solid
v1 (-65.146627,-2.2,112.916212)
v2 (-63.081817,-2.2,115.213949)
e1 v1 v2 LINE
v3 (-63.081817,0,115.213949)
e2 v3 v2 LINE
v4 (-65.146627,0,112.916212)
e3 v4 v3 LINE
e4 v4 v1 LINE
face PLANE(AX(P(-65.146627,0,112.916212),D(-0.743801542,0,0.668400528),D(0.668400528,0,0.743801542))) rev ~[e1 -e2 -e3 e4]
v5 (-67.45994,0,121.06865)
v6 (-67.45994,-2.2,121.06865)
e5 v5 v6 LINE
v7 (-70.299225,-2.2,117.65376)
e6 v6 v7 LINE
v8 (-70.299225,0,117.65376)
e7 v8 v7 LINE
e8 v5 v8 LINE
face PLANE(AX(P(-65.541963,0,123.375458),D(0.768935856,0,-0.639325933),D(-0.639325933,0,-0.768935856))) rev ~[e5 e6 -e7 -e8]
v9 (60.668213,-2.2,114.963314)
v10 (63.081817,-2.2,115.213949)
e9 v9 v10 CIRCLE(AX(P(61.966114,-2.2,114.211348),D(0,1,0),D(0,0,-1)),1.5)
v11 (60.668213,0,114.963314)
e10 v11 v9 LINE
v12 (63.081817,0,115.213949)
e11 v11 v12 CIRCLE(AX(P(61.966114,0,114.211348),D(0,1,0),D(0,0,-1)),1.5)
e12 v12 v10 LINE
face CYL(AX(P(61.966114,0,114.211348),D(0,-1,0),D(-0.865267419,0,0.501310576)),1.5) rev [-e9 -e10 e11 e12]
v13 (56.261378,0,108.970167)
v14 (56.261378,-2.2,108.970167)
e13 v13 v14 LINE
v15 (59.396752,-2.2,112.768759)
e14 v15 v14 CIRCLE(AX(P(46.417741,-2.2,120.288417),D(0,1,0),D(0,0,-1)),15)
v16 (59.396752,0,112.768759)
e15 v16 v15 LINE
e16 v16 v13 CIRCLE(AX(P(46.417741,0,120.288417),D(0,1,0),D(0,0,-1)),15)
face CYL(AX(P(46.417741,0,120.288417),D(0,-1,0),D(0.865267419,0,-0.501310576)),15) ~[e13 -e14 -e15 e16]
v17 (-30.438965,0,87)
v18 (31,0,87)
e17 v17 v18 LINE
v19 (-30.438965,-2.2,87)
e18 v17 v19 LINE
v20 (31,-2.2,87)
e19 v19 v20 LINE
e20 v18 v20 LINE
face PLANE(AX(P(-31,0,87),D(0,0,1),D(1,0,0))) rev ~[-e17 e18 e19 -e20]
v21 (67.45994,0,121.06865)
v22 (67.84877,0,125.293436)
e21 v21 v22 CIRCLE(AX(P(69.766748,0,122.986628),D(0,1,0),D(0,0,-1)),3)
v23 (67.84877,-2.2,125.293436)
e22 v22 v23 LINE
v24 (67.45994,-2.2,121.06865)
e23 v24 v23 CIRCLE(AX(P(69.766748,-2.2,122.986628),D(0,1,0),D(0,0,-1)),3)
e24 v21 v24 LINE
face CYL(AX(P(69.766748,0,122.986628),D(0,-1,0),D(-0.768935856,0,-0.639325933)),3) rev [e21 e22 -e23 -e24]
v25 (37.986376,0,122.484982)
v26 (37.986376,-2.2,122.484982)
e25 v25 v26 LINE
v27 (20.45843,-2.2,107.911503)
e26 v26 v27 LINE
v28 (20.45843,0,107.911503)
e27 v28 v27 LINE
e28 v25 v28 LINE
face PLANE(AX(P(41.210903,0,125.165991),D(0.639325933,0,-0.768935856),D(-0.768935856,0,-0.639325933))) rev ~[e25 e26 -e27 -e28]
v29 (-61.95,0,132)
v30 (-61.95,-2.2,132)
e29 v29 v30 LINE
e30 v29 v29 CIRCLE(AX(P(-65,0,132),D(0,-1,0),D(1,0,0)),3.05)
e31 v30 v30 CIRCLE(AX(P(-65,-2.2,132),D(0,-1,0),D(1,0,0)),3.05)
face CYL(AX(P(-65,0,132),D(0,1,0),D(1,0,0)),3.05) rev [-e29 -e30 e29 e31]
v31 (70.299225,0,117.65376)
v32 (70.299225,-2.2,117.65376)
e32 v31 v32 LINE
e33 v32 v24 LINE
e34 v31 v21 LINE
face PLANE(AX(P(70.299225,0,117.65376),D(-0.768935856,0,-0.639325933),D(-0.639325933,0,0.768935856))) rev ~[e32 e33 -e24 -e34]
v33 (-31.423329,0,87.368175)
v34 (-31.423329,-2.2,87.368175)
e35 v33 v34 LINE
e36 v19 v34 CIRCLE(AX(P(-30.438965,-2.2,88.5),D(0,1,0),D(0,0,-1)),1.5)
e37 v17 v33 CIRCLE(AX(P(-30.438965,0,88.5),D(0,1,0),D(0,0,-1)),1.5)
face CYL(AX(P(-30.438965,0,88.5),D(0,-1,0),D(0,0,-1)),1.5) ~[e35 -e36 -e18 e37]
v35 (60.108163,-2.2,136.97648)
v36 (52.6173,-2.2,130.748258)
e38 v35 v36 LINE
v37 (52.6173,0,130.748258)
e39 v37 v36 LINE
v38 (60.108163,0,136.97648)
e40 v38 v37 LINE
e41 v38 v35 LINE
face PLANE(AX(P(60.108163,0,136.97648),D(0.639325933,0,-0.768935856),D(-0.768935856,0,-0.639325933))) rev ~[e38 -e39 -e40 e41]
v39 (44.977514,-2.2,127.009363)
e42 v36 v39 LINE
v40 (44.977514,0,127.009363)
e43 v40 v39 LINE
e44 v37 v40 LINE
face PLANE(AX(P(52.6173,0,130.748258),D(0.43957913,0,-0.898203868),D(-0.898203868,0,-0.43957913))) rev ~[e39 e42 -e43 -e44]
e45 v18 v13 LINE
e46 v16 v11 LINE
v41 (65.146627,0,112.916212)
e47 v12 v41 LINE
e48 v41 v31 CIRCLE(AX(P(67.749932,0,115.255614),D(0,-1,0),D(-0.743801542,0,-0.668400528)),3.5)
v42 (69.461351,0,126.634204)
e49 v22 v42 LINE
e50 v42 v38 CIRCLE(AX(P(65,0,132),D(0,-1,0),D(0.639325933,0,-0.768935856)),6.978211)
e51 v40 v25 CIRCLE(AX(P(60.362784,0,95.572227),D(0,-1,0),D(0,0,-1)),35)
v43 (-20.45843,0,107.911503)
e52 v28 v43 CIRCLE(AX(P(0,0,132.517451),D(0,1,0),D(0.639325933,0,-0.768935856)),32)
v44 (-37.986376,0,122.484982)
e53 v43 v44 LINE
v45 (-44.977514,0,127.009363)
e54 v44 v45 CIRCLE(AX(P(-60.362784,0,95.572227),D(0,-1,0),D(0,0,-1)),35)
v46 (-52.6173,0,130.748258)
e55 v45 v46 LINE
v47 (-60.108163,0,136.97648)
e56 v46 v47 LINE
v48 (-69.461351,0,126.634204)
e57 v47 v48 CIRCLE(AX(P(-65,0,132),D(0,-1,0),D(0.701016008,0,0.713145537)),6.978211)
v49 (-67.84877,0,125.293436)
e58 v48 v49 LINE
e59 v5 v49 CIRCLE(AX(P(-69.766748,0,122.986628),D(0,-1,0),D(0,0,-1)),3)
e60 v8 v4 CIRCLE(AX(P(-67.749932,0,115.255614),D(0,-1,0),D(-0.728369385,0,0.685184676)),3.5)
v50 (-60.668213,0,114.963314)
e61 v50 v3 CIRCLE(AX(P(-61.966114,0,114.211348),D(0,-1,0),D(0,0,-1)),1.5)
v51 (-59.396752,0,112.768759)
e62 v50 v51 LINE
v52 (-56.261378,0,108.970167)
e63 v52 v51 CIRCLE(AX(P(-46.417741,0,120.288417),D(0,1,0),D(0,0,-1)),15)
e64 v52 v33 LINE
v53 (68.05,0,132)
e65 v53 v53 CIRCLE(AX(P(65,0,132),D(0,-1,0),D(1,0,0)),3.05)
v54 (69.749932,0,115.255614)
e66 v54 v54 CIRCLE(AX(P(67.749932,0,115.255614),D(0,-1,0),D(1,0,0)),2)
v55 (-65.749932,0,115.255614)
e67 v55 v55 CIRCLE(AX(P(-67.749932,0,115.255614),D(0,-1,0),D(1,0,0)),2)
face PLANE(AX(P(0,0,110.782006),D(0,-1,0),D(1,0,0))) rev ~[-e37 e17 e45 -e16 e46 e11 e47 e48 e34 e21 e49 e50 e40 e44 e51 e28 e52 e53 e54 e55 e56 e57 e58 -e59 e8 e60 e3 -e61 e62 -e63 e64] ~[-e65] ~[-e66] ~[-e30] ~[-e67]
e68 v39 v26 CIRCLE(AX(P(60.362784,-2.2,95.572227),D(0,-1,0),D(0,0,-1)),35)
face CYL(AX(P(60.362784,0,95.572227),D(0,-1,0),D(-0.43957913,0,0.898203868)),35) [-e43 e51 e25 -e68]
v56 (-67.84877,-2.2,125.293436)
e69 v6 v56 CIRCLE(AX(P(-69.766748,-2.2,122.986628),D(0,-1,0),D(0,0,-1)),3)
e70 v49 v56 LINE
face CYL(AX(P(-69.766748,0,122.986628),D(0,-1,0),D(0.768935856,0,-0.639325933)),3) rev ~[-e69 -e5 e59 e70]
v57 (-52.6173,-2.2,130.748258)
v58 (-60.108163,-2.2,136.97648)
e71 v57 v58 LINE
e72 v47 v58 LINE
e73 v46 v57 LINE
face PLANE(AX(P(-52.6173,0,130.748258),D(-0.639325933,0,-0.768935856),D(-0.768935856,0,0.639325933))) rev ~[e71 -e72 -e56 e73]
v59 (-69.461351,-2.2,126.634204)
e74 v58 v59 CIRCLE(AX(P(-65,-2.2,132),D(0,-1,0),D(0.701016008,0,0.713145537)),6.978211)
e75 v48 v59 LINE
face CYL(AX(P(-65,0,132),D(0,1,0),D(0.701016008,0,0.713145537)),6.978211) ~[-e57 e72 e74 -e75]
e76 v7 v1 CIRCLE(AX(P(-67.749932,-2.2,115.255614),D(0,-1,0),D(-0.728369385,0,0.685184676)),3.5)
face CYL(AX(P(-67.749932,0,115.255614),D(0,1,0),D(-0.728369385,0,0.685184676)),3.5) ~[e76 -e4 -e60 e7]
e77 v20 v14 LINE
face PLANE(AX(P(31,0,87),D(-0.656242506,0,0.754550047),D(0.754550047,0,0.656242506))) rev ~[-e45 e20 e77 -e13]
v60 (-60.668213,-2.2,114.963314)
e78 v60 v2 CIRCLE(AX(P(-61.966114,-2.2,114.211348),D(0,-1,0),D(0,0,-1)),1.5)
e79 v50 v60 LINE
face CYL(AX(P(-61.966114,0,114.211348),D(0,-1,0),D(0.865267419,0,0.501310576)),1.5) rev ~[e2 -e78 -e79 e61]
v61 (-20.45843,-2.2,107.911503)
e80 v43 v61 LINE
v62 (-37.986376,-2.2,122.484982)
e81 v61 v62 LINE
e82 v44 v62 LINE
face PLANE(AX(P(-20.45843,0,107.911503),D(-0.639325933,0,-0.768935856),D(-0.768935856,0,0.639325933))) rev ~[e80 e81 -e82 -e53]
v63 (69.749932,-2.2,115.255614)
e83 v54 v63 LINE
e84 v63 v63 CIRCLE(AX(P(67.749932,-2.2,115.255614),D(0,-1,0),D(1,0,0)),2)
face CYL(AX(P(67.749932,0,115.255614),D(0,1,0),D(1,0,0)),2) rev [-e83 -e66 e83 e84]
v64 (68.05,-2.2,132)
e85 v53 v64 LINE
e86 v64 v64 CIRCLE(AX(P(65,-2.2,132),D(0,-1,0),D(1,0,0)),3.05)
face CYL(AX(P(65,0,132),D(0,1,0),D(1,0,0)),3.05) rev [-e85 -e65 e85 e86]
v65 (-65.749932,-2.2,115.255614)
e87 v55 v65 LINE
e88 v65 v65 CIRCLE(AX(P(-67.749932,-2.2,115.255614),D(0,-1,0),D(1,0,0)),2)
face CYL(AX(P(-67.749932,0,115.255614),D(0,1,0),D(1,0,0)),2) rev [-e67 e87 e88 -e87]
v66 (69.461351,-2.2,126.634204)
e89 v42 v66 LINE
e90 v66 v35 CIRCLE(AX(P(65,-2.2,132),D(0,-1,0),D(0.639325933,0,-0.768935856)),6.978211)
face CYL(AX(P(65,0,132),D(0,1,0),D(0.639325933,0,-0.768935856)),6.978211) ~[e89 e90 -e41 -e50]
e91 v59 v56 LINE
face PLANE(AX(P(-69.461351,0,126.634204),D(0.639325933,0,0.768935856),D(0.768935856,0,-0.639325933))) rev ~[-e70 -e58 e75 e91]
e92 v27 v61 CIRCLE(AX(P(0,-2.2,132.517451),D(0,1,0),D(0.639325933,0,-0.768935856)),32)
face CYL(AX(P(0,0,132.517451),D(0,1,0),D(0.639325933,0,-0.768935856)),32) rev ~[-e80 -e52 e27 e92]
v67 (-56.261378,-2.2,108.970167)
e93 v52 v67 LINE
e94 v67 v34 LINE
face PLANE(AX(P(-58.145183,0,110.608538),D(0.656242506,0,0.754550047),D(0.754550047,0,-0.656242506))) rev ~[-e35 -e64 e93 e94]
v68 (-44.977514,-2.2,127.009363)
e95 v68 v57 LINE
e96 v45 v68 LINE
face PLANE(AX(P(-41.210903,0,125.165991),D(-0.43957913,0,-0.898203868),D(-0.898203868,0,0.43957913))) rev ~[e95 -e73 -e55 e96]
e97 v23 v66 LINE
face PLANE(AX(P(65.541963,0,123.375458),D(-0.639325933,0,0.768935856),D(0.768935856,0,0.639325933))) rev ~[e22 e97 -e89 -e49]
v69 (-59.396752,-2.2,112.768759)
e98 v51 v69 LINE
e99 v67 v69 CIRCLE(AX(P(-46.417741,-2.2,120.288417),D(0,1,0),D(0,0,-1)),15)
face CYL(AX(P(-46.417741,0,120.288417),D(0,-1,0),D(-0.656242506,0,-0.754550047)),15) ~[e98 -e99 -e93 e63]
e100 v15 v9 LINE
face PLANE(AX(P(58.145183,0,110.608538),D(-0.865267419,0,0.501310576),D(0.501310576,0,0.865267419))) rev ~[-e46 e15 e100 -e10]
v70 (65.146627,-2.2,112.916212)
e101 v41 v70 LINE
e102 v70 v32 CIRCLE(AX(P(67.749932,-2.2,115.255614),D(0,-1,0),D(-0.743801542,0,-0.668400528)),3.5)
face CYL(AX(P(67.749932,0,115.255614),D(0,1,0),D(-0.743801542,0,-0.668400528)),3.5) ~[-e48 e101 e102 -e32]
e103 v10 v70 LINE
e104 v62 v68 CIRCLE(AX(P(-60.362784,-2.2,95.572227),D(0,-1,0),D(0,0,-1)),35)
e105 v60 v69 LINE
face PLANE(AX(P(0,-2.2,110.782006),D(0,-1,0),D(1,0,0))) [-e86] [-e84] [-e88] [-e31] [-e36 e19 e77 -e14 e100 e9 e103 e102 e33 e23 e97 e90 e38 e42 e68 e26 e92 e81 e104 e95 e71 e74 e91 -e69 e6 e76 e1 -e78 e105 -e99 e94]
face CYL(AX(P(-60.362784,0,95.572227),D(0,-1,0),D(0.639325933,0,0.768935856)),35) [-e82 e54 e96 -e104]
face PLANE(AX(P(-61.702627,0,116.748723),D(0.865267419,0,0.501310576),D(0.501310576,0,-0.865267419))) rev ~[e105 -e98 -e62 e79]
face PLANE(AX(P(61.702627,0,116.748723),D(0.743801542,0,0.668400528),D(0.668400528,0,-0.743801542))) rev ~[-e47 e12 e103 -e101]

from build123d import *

# Parameters (mm, degrees)
F0_R     = 2
F0_R_2   = 3.05
F1_DEPTH = 2.2
F2_R     = 35
F3_R     = 15
F4_R     = 1.5
F5_R     = 3


with BuildPart() as f1:
    # F0 (on Front) → F1 (new body)
    with BuildSketch(Plane.XZ):
        with BuildLine():
            Line((52.6173001252, 130.7482583531), (41.2109028752, 125.1659909507))
            Line((41.2109028752, 125.1659909507), (20.4584298604, 107.9115033818))
            ThreePointArc((20.4584298604, 107.9115033818), (0, 100.5174507858), (-20.4584298604, 107.9115033818))
            Line((-20.4584298604, 107.9115033818), (-41.2109028752, 125.1659909507))
            Line((-41.2109028752, 125.1659909507), (-52.6173001252, 130.7482583531))
            Line((-52.6173001252, 130.7482583531), (-60.1081627094, 136.9764796956))
            ThreePointArc((-60.1081627094, 136.9764796956), (-70.17561569, 136.6806435954), (-69.4613509604, 126.6342037081))
            Line((-69.4613509604, 126.6342037081), (-65.5419625699, 123.3754577161))
            Line((-65.5419625699, 123.3754577161), (-70.2992250124, 117.6537600959))
            ThreePointArc((-70.2992250124, 117.6537600959), (-70.1188602171, 112.67914718), (-65.1466267703, 112.9162118817))
            Line((-65.1466267703, 112.9162118817), (-61.7026267828, 116.7487230653))
            Line((-61.7026267828, 116.7487230653), (-58.1451833135, 110.6085375713))
            Line((-58.1451833134, 110.6085375713), (-31, 87))
            Line((-31, 87), (31, 87))
            Line((31, 87), (58.1451833134, 110.6085375713))
            Line((58.1451833135, 110.6085375713), (61.7026267828, 116.7487230653))
            Line((61.7026267828, 116.7487230653), (65.1466267703, 112.9162118817))
            ThreePointArc((65.1466267703, 112.9162118817), (70.1188602171, 112.67914718), (70.2992250124, 117.6537600959))
            Line((70.2992250124, 117.6537600959), (65.5419625699, 123.3754577161))
            Line((65.5419625699, 123.3754577161), (69.4613509604, 126.6342037081))
            ThreePointArc((69.4613509604, 126.6342037081), (70.17561569, 136.6806435954), (60.1081627094, 136.9764796956))
            Line((60.1081627094, 136.9764796956), (52.6173001252, 130.7482583531))
        make_face()
        with Locations((-67.7499321664, 115.2556137314)):
            Circle(F0_R, mode=Mode.SUBTRACT)
        with Locations((-65, 132)):
            Circle(F0_R_2, mode=Mode.SUBTRACT)
        with Locations((67.7499321664, 115.2556137314)):
            Circle(F0_R, mode=Mode.SUBTRACT)
        with Locations((65, 132)):
            Circle(F0_R_2, mode=Mode.SUBTRACT)
    extrude(amount=F1_DEPTH)

    # F2
    f2_edges = [f1.edges().sort_by_distance(p)[0] for p in [
        (41.210903, -1.1, 125.165991),
        (-41.210903, -1.1, 125.165991),
    ]]
    fillet(f2_edges, radius=F2_R)

    # F3
    f3_edges = [f1.edges().sort_by_distance(p)[0] for p in [
        (58.145183, -1.1, 110.608538),
        (-58.145183, -1.1, 110.608538),
    ]]
    fillet(f3_edges, radius=F3_R)

    # F4
    f4_edges = [f1.edges().sort_by_distance(p)[0] for p in [
        (-61.702627, -1.1, 116.748723),
        (61.702627, -1.1, 116.748723),
        (-31, -1.1, 87),
    ]]
    fillet(f4_edges, radius=F4_R)

    # F5
    f5_edges = [f1.edges().sort_by_distance(p)[0] for p in [
        (65.541963, -1.1, 123.375458),
        (-65.541963, -1.1, 123.375458),
    ]]
    fillet(f5_edges, radius=F5_R)


solid = f1.part
